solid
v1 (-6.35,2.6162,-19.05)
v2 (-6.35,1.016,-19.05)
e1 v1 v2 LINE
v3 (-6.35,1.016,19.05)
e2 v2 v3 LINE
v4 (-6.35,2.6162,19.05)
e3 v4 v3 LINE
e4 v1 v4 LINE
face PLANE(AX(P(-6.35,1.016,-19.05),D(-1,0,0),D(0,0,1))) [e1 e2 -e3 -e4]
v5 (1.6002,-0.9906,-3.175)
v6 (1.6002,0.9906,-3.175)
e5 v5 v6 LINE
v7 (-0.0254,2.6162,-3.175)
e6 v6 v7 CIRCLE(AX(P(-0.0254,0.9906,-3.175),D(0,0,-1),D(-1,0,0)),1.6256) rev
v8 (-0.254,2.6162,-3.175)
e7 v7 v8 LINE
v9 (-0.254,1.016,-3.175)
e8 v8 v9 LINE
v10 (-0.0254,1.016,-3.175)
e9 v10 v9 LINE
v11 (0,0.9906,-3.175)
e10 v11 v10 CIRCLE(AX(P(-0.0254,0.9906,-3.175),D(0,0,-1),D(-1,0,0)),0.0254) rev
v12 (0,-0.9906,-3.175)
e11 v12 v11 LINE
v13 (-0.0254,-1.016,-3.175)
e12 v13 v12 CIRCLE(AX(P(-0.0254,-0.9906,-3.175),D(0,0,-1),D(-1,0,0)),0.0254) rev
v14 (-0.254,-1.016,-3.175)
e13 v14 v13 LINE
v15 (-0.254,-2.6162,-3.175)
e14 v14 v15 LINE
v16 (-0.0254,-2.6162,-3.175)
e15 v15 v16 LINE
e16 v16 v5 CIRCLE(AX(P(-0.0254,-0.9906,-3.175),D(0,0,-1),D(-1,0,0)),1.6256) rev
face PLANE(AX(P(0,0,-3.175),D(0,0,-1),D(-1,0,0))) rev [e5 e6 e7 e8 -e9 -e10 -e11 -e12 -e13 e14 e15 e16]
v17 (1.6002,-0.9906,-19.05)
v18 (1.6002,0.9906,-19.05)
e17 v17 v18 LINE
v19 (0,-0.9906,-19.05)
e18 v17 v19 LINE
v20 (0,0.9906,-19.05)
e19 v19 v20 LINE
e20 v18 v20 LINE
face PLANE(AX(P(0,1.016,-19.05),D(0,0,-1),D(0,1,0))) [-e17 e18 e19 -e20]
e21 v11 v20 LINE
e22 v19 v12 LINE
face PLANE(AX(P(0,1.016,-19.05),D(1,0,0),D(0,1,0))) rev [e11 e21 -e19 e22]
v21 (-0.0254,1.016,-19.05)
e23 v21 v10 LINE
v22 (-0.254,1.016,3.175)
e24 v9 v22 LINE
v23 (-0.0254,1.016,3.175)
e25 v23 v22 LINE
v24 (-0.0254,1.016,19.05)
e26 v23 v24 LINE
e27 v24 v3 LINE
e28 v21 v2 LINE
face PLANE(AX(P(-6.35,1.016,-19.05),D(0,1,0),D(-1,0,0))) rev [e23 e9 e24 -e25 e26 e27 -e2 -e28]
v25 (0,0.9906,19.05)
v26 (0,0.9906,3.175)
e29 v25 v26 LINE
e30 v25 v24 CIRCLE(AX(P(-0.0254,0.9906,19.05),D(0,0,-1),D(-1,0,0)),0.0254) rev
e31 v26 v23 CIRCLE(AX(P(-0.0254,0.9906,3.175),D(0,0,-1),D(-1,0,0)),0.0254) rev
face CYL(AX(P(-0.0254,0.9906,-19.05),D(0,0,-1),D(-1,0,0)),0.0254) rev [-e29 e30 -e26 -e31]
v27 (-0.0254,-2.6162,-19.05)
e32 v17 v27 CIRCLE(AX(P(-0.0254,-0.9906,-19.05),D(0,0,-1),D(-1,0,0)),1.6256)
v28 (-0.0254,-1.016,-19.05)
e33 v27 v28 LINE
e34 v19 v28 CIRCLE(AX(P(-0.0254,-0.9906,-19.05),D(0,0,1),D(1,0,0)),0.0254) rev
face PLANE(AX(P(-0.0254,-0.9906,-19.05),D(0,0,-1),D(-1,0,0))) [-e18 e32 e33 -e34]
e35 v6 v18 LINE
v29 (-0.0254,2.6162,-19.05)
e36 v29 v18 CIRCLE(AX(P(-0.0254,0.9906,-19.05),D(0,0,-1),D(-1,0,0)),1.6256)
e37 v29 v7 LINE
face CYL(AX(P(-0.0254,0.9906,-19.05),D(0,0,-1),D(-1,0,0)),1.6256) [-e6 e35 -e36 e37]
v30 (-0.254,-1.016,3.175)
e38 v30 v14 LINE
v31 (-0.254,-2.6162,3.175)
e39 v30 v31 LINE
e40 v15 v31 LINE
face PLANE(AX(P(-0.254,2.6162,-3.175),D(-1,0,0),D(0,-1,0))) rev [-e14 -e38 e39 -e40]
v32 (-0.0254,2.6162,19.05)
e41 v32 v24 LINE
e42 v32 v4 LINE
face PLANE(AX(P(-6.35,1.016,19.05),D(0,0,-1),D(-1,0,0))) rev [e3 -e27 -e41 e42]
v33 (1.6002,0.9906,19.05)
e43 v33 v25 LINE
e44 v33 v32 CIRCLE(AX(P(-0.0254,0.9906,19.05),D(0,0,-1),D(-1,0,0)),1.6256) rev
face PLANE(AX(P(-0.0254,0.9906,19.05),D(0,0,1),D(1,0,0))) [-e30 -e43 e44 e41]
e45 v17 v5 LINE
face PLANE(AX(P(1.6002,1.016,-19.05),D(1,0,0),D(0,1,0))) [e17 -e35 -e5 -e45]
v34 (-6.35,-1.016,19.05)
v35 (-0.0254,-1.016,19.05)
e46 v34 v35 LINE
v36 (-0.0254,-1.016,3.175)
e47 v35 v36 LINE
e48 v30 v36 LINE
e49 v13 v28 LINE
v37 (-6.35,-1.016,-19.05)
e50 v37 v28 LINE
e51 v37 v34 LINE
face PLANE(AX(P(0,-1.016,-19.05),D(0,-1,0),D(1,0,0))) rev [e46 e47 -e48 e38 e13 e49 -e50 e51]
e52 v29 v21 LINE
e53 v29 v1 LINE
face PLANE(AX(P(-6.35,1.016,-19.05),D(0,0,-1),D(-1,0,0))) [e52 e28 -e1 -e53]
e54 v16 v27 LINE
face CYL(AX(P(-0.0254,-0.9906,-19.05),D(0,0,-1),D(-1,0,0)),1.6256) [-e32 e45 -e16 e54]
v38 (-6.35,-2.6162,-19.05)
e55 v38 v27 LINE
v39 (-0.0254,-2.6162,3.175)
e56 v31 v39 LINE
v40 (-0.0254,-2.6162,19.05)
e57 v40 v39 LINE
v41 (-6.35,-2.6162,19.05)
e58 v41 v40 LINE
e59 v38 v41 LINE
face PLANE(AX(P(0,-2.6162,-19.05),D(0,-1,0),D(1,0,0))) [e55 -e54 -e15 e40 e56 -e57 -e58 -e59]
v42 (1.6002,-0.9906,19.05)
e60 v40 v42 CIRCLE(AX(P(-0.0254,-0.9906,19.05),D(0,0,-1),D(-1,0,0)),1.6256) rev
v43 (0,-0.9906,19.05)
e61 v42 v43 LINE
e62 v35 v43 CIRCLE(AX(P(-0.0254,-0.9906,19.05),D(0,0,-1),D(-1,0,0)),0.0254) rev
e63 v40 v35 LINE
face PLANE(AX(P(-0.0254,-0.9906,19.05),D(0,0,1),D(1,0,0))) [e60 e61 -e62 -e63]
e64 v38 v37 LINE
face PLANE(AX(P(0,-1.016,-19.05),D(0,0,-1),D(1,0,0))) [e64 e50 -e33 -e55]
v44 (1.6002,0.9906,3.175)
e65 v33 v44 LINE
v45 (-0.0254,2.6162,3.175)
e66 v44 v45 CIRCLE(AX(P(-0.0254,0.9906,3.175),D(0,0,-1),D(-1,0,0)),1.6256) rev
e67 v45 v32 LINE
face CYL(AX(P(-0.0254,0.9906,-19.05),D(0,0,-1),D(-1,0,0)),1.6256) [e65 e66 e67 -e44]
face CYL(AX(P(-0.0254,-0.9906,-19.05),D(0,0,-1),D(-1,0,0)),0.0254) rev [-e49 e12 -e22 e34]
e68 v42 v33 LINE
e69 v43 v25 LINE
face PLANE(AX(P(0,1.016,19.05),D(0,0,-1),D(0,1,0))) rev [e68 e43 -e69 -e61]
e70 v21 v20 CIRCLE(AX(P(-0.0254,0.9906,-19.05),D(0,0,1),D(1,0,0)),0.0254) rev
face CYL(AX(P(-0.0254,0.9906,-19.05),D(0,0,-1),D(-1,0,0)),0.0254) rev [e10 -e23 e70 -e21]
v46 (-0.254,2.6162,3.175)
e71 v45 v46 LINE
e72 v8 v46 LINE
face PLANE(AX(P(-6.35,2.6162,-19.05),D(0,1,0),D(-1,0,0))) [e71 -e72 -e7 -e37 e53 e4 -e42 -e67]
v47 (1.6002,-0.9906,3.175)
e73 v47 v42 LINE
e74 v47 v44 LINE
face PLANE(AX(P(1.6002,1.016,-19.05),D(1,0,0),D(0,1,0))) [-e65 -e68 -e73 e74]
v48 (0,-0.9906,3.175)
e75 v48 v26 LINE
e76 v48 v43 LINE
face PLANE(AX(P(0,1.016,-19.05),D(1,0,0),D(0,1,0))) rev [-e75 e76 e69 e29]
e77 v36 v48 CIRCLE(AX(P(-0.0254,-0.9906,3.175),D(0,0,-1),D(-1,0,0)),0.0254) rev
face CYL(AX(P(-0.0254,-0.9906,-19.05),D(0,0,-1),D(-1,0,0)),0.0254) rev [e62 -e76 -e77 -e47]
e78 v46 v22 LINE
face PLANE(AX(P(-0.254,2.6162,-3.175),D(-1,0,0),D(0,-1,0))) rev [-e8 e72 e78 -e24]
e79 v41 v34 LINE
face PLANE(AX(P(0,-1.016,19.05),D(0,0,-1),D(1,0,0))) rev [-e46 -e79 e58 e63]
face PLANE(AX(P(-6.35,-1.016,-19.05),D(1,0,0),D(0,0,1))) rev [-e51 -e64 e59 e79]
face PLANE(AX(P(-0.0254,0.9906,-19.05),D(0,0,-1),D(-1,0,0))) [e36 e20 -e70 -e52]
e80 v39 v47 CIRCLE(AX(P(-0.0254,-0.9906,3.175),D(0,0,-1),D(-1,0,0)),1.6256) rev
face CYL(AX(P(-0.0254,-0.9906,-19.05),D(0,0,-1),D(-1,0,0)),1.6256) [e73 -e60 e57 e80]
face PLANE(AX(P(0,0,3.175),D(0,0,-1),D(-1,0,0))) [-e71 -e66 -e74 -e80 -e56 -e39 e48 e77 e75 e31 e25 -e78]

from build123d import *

# Parameters (mm, degrees)
BOSS_EXTRUDE1_DEPTH    = 19.05
CONVERT_SOLID1_START   = -19.05
CONVERT_SOLID1_DEPTH   = 38.1
CONVERT_SOLID1_2_DEPTH = 38.1
SKETCH2_W              = 1.8542
SKETCH2_H              = 5.2324
CUT_EXTRUDE1_DEPTH     = 3.175


# Read off the part's stored shape, not the designer's step: SharpBend1
with BuildPart() as part:
    # Sketch1 → Boss-Extrude1 (new, symmetric)
    with BuildSketch(Plane(origin=(0, 0, 0), x_dir=(1, 0, 0), z_dir=(0, 0, -1))):
        Polygon((1.6002, -2.6162), (-6.35, -2.6162), (-6.35, -1.016), (0, -1.016), (0, 1.016), (-6.35, 1.016), (-6.35, 2.6162), (1.6002, 2.6162), align=None)
    extrude(amount=BOSS_EXTRUDE1_DEPTH, both=True)

    # Convert-Solid1 outline → Convert-Solid1 (cut)
    with BuildSketch(Plane.XY.offset(CONVERT_SOLID1_START)):
        with BuildLine():
            Line((1.6002, -2.6162), (1.6002, -0.9906))
            ThreePointArc((1.6002, -0.9906), (1.124072783, -2.140072783), (-0.0254, -2.6162))
            Line((-0.0254, -2.6162), (1.6002, -2.6162))
        make_face()
        with BuildLine():
            ThreePointArc((-0.0254, 2.6162), (1.124072783, 2.140072783), (1.6002, 0.9906))
            Line((1.6002, 0.9906), (1.6002, 2.6162))
            Line((1.6002, 2.6162), (-0.0254, 2.6162))
        make_face()
    extrude(amount=CONVERT_SOLID1_DEPTH, mode=Mode.SUBTRACT)

    # Convert-Solid1 2 outline → Convert-Solid1 2 (add)
    with BuildSketch(Plane.XY.offset(CONVERT_SOLID1_START)):
        with BuildLine():
            Line((0, -1.016), (0, -0.9906))
            ThreePointArc((0, -0.9906), (-0.007439488, -1.008560512), (-0.0254, -1.016))
            Line((-0.0254, -1.016), (0, -1.016))
        make_face()
        with BuildLine():
            ThreePointArc((-0.0254, 1.016), (-0.007439488, 1.008560512), (0, 0.9906))
            Line((0, 0.9906), (0, 1.016))
            Line((0, 1.016), (-0.0254, 1.016))
        make_face()
    extrude(amount=CONVERT_SOLID1_2_DEPTH)

    # Sketch2 → Cut-Extrude1 (cut, symmetric)
    with BuildSketch(Plane.XY):
        with Locations((0.6731, 0)):
            Rectangle(SKETCH2_W, SKETCH2_H)
    extrude(amount=CUT_EXTRUDE1_DEPTH, both=True, mode=Mode.SUBTRACT)


solid = part.part
